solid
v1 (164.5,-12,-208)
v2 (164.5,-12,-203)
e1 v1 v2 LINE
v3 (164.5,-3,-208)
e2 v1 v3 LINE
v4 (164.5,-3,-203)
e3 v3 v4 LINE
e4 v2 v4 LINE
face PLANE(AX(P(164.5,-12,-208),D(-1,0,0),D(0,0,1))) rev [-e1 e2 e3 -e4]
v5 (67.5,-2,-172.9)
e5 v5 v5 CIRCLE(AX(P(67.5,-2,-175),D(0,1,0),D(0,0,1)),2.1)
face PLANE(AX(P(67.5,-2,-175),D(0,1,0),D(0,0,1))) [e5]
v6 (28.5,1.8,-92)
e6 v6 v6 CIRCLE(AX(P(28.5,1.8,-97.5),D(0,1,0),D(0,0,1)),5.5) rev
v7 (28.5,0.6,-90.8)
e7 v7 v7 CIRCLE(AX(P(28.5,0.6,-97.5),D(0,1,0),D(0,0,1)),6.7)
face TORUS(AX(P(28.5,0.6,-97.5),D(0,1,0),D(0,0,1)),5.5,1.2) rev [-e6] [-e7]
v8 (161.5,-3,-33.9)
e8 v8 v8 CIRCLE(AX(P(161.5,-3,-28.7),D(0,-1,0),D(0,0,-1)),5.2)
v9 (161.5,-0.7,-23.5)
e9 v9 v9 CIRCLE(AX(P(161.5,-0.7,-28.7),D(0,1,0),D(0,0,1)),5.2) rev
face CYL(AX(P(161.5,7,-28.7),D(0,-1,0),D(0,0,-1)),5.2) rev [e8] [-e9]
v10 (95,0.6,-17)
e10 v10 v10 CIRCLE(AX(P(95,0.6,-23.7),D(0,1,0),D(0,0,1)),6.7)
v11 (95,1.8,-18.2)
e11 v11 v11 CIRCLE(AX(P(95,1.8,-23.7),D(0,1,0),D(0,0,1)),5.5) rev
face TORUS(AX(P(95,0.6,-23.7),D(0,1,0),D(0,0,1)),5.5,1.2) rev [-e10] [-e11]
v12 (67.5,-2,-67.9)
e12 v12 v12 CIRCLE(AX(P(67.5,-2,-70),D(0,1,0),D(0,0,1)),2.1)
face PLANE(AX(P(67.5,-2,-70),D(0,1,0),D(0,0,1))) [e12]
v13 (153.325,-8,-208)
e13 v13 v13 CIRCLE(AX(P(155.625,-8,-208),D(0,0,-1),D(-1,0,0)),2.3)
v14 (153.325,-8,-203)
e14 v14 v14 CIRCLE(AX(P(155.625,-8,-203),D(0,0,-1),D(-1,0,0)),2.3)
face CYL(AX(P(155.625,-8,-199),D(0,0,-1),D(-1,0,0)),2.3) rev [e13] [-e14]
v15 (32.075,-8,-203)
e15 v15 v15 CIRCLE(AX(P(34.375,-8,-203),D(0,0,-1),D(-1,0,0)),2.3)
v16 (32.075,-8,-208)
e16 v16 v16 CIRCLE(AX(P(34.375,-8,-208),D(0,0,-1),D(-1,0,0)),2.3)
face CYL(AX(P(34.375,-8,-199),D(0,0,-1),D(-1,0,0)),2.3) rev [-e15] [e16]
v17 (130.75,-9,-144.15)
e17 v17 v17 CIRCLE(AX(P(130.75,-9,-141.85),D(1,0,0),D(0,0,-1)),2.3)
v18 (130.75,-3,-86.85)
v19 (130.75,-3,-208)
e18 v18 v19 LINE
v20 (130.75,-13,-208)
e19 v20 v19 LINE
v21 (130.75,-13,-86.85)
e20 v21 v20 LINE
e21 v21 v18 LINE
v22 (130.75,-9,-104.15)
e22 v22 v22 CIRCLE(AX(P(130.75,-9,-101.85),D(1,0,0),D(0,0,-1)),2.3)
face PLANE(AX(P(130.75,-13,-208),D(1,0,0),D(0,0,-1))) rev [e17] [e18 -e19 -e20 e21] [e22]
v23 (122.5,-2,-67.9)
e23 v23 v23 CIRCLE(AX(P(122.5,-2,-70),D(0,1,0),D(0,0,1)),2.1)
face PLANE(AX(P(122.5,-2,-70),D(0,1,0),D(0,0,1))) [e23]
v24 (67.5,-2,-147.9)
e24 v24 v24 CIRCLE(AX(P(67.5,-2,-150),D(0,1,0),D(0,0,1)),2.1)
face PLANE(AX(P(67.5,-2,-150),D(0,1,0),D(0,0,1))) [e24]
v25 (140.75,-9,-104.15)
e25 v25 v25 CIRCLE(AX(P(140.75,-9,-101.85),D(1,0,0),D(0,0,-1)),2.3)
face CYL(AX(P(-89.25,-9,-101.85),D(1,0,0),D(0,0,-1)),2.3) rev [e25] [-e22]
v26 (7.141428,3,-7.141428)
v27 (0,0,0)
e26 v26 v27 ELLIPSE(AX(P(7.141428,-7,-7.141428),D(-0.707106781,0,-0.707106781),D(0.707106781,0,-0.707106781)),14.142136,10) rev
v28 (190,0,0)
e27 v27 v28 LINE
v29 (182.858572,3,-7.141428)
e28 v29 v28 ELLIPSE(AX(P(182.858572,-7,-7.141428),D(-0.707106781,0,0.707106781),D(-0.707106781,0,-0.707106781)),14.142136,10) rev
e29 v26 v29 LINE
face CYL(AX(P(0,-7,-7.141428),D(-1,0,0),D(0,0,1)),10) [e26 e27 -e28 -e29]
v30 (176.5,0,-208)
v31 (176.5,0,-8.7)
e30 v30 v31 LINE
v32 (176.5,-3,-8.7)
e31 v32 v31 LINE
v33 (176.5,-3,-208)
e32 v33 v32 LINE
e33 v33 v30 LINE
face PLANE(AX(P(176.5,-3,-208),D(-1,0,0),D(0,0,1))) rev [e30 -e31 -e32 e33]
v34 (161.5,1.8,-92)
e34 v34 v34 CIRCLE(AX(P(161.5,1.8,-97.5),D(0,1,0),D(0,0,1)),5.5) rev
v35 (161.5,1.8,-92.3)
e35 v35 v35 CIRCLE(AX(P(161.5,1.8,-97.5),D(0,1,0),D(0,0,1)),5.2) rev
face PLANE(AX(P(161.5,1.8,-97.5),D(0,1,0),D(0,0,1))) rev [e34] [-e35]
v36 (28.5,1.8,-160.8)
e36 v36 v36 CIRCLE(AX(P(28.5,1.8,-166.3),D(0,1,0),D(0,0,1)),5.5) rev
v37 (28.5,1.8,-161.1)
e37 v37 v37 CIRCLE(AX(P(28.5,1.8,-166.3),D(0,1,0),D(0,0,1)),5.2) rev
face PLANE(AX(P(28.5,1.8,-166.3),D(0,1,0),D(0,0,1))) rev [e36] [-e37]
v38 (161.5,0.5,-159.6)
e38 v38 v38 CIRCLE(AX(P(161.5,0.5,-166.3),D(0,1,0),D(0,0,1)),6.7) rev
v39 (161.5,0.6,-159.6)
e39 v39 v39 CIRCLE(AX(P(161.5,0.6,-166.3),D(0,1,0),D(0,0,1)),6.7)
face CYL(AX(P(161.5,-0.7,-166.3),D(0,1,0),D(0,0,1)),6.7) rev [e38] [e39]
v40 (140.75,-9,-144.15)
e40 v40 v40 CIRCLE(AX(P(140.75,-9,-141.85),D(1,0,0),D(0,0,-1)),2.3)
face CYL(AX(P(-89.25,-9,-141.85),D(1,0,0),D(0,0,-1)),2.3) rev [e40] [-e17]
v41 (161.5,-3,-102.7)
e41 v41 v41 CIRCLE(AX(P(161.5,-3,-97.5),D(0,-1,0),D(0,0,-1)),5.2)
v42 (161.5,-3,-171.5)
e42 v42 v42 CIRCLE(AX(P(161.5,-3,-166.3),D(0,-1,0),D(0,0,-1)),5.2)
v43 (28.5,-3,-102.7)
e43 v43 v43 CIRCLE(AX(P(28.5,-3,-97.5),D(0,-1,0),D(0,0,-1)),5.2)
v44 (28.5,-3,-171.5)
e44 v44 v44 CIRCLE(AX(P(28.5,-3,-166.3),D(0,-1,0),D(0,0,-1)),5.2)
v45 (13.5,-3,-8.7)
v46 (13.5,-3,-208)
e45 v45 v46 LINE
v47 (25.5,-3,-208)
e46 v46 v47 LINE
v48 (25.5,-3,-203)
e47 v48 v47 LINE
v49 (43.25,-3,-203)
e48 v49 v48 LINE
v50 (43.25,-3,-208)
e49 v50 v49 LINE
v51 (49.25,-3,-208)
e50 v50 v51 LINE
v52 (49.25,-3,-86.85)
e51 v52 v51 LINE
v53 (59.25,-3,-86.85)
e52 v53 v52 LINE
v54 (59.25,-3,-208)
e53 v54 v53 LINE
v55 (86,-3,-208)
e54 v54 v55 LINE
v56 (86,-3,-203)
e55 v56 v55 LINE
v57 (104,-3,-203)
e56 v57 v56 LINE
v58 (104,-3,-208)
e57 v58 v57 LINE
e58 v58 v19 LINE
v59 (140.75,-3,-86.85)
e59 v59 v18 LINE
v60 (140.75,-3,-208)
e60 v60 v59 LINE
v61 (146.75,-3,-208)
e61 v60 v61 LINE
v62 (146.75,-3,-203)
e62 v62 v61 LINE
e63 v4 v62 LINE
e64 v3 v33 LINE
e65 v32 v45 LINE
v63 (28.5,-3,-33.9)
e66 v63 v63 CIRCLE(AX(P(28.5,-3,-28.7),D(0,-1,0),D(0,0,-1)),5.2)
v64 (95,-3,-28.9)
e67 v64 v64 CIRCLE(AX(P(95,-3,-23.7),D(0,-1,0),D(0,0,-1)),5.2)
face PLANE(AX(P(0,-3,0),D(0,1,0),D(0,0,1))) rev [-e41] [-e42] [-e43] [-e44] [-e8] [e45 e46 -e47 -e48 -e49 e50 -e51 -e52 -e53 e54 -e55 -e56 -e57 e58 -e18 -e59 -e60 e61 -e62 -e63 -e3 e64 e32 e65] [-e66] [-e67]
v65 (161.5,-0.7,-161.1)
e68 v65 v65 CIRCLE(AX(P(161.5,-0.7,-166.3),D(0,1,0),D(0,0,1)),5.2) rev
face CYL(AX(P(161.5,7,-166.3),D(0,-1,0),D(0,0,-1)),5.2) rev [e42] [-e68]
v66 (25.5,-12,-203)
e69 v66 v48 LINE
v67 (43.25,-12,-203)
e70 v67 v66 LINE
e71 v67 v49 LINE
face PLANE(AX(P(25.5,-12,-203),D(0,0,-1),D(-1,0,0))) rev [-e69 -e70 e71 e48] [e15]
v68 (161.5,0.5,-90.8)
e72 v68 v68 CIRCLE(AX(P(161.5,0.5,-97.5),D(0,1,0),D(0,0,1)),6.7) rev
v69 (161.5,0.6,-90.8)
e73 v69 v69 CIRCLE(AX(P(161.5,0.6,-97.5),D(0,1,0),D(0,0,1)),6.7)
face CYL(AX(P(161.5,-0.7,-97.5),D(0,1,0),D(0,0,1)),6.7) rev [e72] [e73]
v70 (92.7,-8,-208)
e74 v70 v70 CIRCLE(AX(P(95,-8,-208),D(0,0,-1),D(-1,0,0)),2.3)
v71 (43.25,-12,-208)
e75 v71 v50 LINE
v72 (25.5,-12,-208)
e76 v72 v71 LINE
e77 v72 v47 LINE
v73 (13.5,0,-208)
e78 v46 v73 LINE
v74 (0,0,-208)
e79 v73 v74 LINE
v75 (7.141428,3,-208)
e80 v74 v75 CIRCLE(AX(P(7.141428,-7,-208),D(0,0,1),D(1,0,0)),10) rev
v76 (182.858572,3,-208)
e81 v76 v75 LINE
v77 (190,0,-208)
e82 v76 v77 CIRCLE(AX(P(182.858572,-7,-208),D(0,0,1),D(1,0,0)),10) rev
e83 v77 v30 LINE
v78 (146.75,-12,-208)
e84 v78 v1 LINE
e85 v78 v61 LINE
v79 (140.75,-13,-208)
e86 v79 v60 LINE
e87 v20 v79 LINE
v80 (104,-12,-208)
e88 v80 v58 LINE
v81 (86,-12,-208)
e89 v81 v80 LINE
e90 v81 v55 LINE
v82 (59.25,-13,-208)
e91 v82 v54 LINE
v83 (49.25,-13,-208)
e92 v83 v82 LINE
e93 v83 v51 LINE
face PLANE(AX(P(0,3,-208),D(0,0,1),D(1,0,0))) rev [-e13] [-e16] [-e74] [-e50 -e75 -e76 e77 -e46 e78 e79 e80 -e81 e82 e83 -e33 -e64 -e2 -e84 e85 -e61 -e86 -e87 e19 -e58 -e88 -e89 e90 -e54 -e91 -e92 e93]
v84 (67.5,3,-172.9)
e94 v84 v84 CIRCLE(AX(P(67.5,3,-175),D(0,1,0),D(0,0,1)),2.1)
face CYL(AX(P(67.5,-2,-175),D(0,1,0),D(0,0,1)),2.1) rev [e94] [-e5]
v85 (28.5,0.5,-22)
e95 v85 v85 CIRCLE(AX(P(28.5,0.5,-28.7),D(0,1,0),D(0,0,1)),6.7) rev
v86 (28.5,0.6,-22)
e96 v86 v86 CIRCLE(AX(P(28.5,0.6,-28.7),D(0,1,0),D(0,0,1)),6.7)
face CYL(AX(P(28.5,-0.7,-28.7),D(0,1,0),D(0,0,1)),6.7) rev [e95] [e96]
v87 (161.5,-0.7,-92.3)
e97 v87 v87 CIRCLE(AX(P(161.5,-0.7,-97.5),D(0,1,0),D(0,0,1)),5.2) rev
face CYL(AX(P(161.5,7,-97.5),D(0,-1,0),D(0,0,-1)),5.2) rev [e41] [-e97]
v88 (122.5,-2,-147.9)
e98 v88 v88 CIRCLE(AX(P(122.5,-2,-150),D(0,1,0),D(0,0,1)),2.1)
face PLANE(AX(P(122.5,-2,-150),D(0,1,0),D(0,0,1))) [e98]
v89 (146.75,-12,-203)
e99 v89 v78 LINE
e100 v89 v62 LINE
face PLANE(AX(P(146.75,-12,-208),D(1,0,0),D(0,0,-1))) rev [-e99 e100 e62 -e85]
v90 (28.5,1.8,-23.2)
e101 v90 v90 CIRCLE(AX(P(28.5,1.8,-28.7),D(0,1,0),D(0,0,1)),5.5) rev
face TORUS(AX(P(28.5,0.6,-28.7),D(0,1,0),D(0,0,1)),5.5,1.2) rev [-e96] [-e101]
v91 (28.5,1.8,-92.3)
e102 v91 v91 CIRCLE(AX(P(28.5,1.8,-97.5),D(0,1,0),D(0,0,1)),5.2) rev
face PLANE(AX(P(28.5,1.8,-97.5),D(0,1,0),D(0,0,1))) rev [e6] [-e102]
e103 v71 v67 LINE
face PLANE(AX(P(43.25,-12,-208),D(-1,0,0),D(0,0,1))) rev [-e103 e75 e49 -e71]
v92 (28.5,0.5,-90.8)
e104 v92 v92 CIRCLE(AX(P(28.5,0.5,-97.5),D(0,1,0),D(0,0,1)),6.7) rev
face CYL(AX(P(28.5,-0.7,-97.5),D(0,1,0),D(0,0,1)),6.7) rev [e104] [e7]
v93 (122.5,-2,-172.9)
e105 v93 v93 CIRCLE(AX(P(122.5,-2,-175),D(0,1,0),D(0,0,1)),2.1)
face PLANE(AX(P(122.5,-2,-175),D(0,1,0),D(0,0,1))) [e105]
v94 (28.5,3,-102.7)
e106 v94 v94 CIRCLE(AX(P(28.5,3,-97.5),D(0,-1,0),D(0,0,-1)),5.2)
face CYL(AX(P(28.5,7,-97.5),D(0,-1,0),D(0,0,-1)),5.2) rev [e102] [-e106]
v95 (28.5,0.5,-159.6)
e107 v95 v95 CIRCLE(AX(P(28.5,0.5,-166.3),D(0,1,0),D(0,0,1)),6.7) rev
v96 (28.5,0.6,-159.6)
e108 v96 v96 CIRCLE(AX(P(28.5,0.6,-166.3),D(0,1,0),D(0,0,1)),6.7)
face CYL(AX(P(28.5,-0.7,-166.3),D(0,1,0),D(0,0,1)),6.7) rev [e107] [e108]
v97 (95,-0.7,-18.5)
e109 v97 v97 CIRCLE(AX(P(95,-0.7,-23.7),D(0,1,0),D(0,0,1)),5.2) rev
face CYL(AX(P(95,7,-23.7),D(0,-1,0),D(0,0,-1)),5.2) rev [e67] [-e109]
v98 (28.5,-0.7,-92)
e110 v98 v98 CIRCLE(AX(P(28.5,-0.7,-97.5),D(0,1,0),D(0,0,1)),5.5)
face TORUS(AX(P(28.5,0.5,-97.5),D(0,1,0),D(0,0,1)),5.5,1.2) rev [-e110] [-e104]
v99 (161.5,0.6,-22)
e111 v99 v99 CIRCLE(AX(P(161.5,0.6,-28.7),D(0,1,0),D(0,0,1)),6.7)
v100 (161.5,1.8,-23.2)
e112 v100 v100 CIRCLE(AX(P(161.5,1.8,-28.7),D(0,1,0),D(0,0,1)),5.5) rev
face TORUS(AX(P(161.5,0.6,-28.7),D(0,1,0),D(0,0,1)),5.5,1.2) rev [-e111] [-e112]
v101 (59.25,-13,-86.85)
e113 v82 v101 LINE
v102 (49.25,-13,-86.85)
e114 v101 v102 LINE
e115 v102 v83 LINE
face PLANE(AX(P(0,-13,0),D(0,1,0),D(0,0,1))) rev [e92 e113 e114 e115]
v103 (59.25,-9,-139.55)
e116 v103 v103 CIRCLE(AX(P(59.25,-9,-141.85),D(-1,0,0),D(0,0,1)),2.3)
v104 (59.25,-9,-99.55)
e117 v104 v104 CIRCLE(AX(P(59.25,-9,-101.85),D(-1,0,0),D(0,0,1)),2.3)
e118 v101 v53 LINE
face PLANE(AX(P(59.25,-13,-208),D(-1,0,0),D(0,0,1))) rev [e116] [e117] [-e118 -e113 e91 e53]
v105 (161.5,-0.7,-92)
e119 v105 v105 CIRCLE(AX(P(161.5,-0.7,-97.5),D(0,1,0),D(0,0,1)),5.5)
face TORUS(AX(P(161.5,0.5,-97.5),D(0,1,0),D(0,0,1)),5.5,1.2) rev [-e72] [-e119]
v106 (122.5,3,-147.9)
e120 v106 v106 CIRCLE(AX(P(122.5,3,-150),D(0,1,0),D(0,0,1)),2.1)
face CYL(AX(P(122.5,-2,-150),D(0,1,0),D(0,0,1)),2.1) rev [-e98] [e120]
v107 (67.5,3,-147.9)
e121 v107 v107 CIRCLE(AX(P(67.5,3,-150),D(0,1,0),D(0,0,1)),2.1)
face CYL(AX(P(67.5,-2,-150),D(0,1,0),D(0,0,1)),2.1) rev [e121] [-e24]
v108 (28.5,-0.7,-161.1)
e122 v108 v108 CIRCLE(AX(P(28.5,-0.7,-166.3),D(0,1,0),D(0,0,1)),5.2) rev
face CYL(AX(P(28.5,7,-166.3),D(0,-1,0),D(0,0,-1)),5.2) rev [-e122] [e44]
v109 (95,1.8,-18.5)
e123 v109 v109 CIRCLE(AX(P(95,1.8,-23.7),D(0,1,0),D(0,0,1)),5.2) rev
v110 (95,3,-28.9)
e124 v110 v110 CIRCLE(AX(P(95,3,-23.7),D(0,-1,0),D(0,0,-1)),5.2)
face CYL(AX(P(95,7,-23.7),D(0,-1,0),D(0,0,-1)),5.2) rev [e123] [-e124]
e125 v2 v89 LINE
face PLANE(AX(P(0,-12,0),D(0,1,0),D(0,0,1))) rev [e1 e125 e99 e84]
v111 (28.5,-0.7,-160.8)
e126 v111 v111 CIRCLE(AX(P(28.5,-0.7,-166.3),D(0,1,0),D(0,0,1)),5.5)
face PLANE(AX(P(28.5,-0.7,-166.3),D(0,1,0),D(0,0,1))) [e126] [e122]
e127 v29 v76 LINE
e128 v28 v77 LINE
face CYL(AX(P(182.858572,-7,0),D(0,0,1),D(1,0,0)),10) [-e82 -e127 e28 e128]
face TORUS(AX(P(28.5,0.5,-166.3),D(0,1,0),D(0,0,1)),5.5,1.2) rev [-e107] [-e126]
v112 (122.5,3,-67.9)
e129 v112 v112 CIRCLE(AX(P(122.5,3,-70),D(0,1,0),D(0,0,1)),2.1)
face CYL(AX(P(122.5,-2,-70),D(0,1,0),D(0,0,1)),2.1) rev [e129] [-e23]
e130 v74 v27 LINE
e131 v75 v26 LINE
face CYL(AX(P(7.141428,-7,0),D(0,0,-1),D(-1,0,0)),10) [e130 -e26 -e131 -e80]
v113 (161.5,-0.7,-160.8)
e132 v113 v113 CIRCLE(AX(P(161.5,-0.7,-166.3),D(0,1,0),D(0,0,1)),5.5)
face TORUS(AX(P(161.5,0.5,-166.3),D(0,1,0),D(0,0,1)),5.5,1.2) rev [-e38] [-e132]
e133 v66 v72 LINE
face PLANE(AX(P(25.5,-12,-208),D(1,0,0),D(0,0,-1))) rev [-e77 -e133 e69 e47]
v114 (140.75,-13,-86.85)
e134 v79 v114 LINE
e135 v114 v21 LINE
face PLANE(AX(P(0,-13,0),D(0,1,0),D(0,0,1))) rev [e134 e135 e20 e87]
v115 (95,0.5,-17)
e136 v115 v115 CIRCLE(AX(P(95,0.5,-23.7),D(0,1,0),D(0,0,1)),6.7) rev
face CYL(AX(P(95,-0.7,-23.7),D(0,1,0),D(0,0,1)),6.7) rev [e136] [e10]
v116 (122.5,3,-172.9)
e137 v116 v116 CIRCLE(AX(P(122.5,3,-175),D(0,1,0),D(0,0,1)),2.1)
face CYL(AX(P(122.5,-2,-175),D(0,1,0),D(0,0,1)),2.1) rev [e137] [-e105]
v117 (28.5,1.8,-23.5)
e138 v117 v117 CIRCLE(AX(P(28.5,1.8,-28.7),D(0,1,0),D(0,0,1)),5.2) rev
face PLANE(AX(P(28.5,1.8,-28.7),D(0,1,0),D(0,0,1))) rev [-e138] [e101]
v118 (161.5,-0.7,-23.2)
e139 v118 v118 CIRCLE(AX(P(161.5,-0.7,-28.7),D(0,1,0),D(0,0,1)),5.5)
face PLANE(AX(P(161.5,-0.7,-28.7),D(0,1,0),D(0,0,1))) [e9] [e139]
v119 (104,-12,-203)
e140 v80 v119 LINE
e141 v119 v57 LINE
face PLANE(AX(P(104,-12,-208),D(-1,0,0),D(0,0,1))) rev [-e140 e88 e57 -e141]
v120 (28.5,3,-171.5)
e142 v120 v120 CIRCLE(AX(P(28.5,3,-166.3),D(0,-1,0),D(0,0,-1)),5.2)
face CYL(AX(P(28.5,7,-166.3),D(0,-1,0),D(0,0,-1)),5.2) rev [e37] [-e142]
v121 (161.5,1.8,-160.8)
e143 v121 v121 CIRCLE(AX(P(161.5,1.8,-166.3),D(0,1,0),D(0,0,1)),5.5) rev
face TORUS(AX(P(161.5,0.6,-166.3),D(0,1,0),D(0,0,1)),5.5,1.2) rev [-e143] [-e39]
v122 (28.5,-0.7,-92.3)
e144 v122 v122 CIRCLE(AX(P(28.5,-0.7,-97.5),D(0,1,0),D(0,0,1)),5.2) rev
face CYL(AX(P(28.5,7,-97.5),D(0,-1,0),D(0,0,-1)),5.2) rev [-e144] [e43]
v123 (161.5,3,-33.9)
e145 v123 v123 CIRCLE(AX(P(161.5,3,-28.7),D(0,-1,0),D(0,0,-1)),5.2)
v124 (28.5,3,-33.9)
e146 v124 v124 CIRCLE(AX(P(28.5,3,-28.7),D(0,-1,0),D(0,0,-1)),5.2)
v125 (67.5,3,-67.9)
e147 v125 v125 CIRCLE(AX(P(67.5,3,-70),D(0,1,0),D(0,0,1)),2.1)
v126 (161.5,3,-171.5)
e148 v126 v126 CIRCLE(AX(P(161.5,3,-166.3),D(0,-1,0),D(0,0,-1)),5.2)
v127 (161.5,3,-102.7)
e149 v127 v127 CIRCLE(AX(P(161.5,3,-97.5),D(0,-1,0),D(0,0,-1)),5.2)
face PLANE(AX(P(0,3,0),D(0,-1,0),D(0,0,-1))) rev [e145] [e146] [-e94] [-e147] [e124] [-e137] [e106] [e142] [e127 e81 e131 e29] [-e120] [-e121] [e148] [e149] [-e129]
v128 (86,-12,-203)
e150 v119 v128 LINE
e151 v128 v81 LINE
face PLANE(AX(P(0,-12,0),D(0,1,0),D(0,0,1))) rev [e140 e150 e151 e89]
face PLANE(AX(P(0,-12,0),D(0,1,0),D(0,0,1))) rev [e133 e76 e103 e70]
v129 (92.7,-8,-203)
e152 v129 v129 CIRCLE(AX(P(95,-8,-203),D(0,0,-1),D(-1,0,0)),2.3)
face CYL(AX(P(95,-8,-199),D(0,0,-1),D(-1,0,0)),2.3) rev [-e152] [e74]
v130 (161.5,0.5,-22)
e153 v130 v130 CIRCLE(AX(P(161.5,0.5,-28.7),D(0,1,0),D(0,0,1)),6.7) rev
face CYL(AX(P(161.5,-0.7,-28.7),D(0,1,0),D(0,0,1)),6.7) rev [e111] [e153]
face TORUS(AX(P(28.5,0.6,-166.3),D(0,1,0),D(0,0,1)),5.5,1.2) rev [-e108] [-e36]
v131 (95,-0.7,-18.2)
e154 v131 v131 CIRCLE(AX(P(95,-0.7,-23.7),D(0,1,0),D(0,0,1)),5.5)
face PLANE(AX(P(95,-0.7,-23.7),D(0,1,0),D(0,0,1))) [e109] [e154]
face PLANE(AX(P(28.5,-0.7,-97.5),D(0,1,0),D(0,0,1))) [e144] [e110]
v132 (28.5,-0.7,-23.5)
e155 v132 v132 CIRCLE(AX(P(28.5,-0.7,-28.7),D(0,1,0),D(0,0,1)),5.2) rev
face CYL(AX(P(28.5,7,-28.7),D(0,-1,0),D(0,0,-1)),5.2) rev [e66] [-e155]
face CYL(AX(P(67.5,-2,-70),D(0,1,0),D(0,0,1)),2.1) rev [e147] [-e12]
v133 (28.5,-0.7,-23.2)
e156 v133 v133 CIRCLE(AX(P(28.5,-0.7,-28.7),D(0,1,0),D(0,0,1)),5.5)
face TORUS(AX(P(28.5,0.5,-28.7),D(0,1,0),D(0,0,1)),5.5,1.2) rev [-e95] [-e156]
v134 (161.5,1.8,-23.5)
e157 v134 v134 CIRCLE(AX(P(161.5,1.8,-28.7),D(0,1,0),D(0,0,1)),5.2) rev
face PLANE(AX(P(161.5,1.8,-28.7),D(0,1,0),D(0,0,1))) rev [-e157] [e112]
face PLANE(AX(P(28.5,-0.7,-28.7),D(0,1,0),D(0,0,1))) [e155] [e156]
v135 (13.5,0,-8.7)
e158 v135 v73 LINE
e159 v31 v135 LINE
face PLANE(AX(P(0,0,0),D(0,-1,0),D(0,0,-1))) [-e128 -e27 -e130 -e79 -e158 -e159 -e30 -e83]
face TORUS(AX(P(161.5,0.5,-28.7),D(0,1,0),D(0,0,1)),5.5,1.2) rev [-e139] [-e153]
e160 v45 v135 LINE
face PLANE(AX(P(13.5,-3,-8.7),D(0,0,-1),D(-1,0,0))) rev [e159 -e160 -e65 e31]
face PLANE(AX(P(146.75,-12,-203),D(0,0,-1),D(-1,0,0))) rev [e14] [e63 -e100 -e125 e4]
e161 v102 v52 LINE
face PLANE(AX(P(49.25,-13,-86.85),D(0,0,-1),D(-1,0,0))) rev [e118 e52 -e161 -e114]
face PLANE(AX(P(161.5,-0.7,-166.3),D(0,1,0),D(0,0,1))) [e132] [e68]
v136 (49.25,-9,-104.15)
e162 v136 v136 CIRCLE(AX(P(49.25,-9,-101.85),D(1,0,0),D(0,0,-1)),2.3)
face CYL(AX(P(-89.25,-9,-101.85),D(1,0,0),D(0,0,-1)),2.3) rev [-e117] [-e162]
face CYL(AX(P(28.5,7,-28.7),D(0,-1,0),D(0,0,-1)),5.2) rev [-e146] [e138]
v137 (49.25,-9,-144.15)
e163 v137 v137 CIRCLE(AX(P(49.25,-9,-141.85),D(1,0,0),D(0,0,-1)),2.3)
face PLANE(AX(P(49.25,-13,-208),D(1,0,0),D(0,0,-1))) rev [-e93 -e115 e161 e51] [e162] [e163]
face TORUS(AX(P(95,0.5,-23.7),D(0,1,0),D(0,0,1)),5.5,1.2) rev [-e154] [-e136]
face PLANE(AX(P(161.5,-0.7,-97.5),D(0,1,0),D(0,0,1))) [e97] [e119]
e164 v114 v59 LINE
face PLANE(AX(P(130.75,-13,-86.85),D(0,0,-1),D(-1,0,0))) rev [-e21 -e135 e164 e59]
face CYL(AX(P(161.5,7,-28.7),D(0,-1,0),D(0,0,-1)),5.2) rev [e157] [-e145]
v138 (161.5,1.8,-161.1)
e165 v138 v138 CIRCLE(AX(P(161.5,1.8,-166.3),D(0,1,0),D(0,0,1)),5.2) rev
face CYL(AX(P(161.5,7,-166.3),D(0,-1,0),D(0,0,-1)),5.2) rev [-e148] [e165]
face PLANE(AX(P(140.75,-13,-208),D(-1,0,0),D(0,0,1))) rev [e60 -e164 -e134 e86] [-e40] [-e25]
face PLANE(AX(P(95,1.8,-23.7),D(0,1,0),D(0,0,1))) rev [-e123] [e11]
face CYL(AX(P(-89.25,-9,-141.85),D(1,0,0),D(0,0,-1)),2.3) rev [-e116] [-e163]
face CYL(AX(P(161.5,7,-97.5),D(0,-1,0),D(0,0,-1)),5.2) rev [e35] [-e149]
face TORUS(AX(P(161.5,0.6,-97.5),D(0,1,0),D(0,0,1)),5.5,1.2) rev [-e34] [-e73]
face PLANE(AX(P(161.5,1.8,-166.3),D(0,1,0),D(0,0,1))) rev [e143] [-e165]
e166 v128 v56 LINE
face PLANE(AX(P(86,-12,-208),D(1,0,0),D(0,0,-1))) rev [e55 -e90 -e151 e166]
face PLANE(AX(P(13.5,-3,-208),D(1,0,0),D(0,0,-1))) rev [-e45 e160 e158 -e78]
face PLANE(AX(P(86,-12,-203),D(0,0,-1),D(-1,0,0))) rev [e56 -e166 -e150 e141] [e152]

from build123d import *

# Parameters (mm, degrees)
SKETCH_1_W          = 190
SKETCH_1_H          = 208
EXTRUDE_1_DEPTH     = 3
FILLET_1_R          = 10
SKETCH_2_W          = 163
SKETCH_2_H          = 199.3
EXTRUDE_2_DEPTH     = 3
SKETCH_3_W          = 10
SKETCH_3_H          = 121.15
EXTRUDE_3_DEPTH     = 10
SKETCH_4_W          = 17.75
SKETCH_4_H          = 5
SKETCH_4_W_2        = 18
EXTRUDE_4_DEPTH     = 9
SKETCH_5_R          = 2.3
CUT_EXTRUDE_1_DEPTH = 9
SKETCH_6_R          = 2.3
CUT_EXTRUDE_2_DEPTH = 230
SKETCH_7_R          = 5.2
CUT_EXTRUDE_3_DEPTH = 10
CUT_EXTRUDE_START   = -1.2
SKETCH_8_R          = 6.7
CUT_EXTRUDE_4_DEPTH = 2.5
FILLET_2_R          = 1.2
SKETCH_11_R         = 2.1
CUT_EXTRUDE_5_DEPTH = 5


with BuildPart() as part:
    # Эскиз1 → Бобышка-Вытянуть1 (new body)
    with BuildSketch(Plane(origin=(0, 0, 0), x_dir=(1, 0, 0), z_dir=(0, 1, 0))):
        with Locations((95, 104)):
            Rectangle(SKETCH_1_W, SKETCH_1_H)
    extrude(amount=EXTRUDE_1_DEPTH)

    # Скругление1
    # the kernel refuses this fillet: 10 mm, written as the material it takes off along each edge
    with BuildSketch(Plane(origin=(190, 3, 17.853571071), x_dir=(0, -1, 0), z_dir=(0, 0, -1)), Plane(origin=(0, 3, -225.853571071), x_dir=(0, -1, 0), z_dir=(0, 0, 1))) as fillet_1_piece_1:
        with BuildLine():
            CenterArc((10, 7.141428429), FILLET_1_R, 180, 45.572995999)
            Line((0, 7.141428429), (-0.2, 7.141428429))
            Line((-0.2, 7.141428429), (-0.2, 0))
            Line((-0.2, 0), (0, -0.2))
            ThreePointArc((0, -0.2), (1.5, -0.2), (2.86, -0.142828569))
            Line((2.86, -0.142828569), (3, 0))
        make_face()
    extrude(amount=243.707142143, mode=Mode.SUBTRACT)
    with BuildSketch(Plane(origin=(-17.853571071, 3, 0), x_dir=(0, -1, 0), z_dir=(1, 0, 0))) as fillet_1_piece_2:
        with BuildLine():
            CenterArc((10, 7.141428429), FILLET_1_R, 180, 45.572995999)
            Line((0, 7.141428429), (-0.2, 7.141428429))
            Line((-0.2, 7.141428429), (-0.2, 0))
            Line((-0.2, 0), (0, -0.2))
            ThreePointArc((0, -0.2), (1.5, -0.2), (2.86, -0.142828569))
            Line((2.86, -0.142828569), (3, 0))
        make_face()
    extrude(amount=225.707142143, mode=Mode.SUBTRACT)

    # Эскиз2 → Бобышка-Вытянуть2 (add)
    with BuildSketch(Plane.XZ):
        with Locations((95, -108.35)):
            Rectangle(SKETCH_2_W, SKETCH_2_H)
    extrude(amount=EXTRUDE_2_DEPTH)

    # Эскиз3 → Бобышка-Вытянуть3 (add)
    with BuildSketch(Plane.XZ.offset(3)):
        with Locations((54.25, -147.425)):
            Rectangle(SKETCH_3_W, SKETCH_3_H)
        with Locations((135.75, -147.425)):
            Rectangle(SKETCH_3_W, SKETCH_3_H)
    extrude(amount=EXTRUDE_3_DEPTH)

    # Эскиз4 → Бобышка-Вытянуть4 (add)
    with BuildSketch(Plane.XZ.offset(3)):
        with Locations((34.375, -205.5)):
            Rectangle(SKETCH_4_W, SKETCH_4_H)
        with Locations((95, -205.5)):
            Rectangle(SKETCH_4_W_2, SKETCH_4_H)
        with Locations((155.625, -205.5)):
            Rectangle(SKETCH_4_W, SKETCH_4_H)
    extrude(amount=EXTRUDE_4_DEPTH)

    # Эскиз5 → Вырез-Вытянуть1 (cut)
    with BuildSketch(Plane(origin=(0, 0, -208), x_dir=(-1, 0, 0), z_dir=(0, 0, -1))):
        with Locations((-155.625, -8)):
            Circle(SKETCH_5_R)
        with Locations((-95, -8)):
            Circle(SKETCH_5_R)
        with Locations((-34.375, -8)):
            Circle(SKETCH_5_R)
    extrude(amount=-CUT_EXTRUDE_1_DEPTH, mode=Mode.SUBTRACT)

    # Эскиз6 → Вырез-Вытянуть2 (cut)
    with BuildSketch(Plane(origin=(140.75, 0, 0), x_dir=(0, 0, -1), z_dir=(1, 0, 0))):
        with Locations((101.85, -9)):
            Circle(SKETCH_6_R)
        with Locations((141.85, -9)):
            Circle(SKETCH_6_R)
    extrude(amount=-CUT_EXTRUDE_2_DEPTH, mode=Mode.SUBTRACT)

    # Эскиз7 → Вырез-Вытянуть3 (cut)
    with BuildSketch(Plane.XZ.offset(3)):
        with Locations(Location((95, -23.7, 0), (0, 0, 270))):
            Circle(SKETCH_7_R)
        with Locations(Location((28.5, -166.3, 0), (0, 0, 270))):
            Circle(SKETCH_7_R)
        with Locations(Location((28.5, -97.5, 0), (0, 0, 270))):
            Circle(SKETCH_7_R)
        with Locations(Location((28.5, -28.7, 0), (0, 0, 270))):
            Circle(SKETCH_7_R)
        with Locations(Location((161.5, -166.3, 0), (0, 0, 270))):
            Circle(SKETCH_7_R)
        with Locations(Location((161.5, -97.5, 0), (0, 0, 270))):
            Circle(SKETCH_7_R)
        with Locations(Location((161.5, -28.7, 0), (0, 0, 270))):
            Circle(SKETCH_7_R)
    extrude(amount=-CUT_EXTRUDE_3_DEPTH, mode=Mode.SUBTRACT)

    # Эскиз8 → Вырез-Вытянуть4 (cut)
    with BuildSketch(Plane(origin=(0, 3, 0), x_dir=(1, 0, 0), z_dir=(0, 1, 0)).offset(CUT_EXTRUDE_START)):
        with Locations(Location((28.5, 166.3, 0), (0, 0, 270))):
            Circle(SKETCH_8_R)
        with Locations(Location((28.5, 97.5, 0), (0, 0, 270))):
            Circle(SKETCH_8_R)
        with Locations(Location((28.5, 28.7, 0), (0, 0, 270))):
            Circle(SKETCH_8_R)
        with Locations(Location((95, 23.7, 0), (0, 0, 270))):
            Circle(SKETCH_8_R)
        with Locations(Location((161.5, 28.7, 0), (0, 0, 270))):
            Circle(SKETCH_8_R)
        with Locations(Location((161.5, 97.5, 0), (0, 0, 270))):
            Circle(SKETCH_8_R)
        with Locations(Location((161.5, 166.3, 0), (0, 0, 270))):
            Circle(SKETCH_8_R)
    extrude(amount=-CUT_EXTRUDE_4_DEPTH, mode=Mode.SUBTRACT)

    # Скругление2
    fillet_2_edges = [part.edges().sort_by_distance(p)[0] for p in [
        (28.5, 1.8, -104.2),
        (28.5, -0.7, -104.2),
        (28.5, 1.8, -35.4),
        (28.5, -0.7, -35.4),
        (95, 1.8, -30.4),
        (95, -0.7, -30.4),
        (161.5, 1.8, -35.4),
        (161.5, -0.7, -35.4),
        (161.5, 1.8, -104.2),
        (161.5, -0.7, -104.2),
        (161.5, 1.8, -173),
        (161.5, -0.7, -173),
        (28.5, 1.8, -173),
        (28.5, -0.7, -173),
    ]]
    fillet(fillet_2_edges, radius=FILLET_2_R)

    # Эскиз11 → Вырез-Вытянуть5 (cut)
    with BuildSketch(Plane(origin=(0, 3, 0), x_dir=(1, 0, 0), z_dir=(0, 1, 0))):
        with Locations(Location((67.5, 70, 0), (0, 0, 270))):
            Circle(SKETCH_11_R)
        with Locations(Location((122.5, 70, 0), (0, 0, 270))):
            Circle(SKETCH_11_R)
        with Locations(Location((122.5, 150, 0), (0, 0, 270))):
            Circle(SKETCH_11_R)
        with Locations(Location((122.5, 175, 0), (0, 0, 270))):
            Circle(SKETCH_11_R)
        with Locations(Location((67.5, 175, 0), (0, 0, 270))):
            Circle(SKETCH_11_R)
        with Locations(Location((67.5, 150, 0), (0, 0, 270))):
            Circle(SKETCH_11_R)
    extrude(amount=-CUT_EXTRUDE_5_DEPTH, mode=Mode.SUBTRACT)


solid = part.part
